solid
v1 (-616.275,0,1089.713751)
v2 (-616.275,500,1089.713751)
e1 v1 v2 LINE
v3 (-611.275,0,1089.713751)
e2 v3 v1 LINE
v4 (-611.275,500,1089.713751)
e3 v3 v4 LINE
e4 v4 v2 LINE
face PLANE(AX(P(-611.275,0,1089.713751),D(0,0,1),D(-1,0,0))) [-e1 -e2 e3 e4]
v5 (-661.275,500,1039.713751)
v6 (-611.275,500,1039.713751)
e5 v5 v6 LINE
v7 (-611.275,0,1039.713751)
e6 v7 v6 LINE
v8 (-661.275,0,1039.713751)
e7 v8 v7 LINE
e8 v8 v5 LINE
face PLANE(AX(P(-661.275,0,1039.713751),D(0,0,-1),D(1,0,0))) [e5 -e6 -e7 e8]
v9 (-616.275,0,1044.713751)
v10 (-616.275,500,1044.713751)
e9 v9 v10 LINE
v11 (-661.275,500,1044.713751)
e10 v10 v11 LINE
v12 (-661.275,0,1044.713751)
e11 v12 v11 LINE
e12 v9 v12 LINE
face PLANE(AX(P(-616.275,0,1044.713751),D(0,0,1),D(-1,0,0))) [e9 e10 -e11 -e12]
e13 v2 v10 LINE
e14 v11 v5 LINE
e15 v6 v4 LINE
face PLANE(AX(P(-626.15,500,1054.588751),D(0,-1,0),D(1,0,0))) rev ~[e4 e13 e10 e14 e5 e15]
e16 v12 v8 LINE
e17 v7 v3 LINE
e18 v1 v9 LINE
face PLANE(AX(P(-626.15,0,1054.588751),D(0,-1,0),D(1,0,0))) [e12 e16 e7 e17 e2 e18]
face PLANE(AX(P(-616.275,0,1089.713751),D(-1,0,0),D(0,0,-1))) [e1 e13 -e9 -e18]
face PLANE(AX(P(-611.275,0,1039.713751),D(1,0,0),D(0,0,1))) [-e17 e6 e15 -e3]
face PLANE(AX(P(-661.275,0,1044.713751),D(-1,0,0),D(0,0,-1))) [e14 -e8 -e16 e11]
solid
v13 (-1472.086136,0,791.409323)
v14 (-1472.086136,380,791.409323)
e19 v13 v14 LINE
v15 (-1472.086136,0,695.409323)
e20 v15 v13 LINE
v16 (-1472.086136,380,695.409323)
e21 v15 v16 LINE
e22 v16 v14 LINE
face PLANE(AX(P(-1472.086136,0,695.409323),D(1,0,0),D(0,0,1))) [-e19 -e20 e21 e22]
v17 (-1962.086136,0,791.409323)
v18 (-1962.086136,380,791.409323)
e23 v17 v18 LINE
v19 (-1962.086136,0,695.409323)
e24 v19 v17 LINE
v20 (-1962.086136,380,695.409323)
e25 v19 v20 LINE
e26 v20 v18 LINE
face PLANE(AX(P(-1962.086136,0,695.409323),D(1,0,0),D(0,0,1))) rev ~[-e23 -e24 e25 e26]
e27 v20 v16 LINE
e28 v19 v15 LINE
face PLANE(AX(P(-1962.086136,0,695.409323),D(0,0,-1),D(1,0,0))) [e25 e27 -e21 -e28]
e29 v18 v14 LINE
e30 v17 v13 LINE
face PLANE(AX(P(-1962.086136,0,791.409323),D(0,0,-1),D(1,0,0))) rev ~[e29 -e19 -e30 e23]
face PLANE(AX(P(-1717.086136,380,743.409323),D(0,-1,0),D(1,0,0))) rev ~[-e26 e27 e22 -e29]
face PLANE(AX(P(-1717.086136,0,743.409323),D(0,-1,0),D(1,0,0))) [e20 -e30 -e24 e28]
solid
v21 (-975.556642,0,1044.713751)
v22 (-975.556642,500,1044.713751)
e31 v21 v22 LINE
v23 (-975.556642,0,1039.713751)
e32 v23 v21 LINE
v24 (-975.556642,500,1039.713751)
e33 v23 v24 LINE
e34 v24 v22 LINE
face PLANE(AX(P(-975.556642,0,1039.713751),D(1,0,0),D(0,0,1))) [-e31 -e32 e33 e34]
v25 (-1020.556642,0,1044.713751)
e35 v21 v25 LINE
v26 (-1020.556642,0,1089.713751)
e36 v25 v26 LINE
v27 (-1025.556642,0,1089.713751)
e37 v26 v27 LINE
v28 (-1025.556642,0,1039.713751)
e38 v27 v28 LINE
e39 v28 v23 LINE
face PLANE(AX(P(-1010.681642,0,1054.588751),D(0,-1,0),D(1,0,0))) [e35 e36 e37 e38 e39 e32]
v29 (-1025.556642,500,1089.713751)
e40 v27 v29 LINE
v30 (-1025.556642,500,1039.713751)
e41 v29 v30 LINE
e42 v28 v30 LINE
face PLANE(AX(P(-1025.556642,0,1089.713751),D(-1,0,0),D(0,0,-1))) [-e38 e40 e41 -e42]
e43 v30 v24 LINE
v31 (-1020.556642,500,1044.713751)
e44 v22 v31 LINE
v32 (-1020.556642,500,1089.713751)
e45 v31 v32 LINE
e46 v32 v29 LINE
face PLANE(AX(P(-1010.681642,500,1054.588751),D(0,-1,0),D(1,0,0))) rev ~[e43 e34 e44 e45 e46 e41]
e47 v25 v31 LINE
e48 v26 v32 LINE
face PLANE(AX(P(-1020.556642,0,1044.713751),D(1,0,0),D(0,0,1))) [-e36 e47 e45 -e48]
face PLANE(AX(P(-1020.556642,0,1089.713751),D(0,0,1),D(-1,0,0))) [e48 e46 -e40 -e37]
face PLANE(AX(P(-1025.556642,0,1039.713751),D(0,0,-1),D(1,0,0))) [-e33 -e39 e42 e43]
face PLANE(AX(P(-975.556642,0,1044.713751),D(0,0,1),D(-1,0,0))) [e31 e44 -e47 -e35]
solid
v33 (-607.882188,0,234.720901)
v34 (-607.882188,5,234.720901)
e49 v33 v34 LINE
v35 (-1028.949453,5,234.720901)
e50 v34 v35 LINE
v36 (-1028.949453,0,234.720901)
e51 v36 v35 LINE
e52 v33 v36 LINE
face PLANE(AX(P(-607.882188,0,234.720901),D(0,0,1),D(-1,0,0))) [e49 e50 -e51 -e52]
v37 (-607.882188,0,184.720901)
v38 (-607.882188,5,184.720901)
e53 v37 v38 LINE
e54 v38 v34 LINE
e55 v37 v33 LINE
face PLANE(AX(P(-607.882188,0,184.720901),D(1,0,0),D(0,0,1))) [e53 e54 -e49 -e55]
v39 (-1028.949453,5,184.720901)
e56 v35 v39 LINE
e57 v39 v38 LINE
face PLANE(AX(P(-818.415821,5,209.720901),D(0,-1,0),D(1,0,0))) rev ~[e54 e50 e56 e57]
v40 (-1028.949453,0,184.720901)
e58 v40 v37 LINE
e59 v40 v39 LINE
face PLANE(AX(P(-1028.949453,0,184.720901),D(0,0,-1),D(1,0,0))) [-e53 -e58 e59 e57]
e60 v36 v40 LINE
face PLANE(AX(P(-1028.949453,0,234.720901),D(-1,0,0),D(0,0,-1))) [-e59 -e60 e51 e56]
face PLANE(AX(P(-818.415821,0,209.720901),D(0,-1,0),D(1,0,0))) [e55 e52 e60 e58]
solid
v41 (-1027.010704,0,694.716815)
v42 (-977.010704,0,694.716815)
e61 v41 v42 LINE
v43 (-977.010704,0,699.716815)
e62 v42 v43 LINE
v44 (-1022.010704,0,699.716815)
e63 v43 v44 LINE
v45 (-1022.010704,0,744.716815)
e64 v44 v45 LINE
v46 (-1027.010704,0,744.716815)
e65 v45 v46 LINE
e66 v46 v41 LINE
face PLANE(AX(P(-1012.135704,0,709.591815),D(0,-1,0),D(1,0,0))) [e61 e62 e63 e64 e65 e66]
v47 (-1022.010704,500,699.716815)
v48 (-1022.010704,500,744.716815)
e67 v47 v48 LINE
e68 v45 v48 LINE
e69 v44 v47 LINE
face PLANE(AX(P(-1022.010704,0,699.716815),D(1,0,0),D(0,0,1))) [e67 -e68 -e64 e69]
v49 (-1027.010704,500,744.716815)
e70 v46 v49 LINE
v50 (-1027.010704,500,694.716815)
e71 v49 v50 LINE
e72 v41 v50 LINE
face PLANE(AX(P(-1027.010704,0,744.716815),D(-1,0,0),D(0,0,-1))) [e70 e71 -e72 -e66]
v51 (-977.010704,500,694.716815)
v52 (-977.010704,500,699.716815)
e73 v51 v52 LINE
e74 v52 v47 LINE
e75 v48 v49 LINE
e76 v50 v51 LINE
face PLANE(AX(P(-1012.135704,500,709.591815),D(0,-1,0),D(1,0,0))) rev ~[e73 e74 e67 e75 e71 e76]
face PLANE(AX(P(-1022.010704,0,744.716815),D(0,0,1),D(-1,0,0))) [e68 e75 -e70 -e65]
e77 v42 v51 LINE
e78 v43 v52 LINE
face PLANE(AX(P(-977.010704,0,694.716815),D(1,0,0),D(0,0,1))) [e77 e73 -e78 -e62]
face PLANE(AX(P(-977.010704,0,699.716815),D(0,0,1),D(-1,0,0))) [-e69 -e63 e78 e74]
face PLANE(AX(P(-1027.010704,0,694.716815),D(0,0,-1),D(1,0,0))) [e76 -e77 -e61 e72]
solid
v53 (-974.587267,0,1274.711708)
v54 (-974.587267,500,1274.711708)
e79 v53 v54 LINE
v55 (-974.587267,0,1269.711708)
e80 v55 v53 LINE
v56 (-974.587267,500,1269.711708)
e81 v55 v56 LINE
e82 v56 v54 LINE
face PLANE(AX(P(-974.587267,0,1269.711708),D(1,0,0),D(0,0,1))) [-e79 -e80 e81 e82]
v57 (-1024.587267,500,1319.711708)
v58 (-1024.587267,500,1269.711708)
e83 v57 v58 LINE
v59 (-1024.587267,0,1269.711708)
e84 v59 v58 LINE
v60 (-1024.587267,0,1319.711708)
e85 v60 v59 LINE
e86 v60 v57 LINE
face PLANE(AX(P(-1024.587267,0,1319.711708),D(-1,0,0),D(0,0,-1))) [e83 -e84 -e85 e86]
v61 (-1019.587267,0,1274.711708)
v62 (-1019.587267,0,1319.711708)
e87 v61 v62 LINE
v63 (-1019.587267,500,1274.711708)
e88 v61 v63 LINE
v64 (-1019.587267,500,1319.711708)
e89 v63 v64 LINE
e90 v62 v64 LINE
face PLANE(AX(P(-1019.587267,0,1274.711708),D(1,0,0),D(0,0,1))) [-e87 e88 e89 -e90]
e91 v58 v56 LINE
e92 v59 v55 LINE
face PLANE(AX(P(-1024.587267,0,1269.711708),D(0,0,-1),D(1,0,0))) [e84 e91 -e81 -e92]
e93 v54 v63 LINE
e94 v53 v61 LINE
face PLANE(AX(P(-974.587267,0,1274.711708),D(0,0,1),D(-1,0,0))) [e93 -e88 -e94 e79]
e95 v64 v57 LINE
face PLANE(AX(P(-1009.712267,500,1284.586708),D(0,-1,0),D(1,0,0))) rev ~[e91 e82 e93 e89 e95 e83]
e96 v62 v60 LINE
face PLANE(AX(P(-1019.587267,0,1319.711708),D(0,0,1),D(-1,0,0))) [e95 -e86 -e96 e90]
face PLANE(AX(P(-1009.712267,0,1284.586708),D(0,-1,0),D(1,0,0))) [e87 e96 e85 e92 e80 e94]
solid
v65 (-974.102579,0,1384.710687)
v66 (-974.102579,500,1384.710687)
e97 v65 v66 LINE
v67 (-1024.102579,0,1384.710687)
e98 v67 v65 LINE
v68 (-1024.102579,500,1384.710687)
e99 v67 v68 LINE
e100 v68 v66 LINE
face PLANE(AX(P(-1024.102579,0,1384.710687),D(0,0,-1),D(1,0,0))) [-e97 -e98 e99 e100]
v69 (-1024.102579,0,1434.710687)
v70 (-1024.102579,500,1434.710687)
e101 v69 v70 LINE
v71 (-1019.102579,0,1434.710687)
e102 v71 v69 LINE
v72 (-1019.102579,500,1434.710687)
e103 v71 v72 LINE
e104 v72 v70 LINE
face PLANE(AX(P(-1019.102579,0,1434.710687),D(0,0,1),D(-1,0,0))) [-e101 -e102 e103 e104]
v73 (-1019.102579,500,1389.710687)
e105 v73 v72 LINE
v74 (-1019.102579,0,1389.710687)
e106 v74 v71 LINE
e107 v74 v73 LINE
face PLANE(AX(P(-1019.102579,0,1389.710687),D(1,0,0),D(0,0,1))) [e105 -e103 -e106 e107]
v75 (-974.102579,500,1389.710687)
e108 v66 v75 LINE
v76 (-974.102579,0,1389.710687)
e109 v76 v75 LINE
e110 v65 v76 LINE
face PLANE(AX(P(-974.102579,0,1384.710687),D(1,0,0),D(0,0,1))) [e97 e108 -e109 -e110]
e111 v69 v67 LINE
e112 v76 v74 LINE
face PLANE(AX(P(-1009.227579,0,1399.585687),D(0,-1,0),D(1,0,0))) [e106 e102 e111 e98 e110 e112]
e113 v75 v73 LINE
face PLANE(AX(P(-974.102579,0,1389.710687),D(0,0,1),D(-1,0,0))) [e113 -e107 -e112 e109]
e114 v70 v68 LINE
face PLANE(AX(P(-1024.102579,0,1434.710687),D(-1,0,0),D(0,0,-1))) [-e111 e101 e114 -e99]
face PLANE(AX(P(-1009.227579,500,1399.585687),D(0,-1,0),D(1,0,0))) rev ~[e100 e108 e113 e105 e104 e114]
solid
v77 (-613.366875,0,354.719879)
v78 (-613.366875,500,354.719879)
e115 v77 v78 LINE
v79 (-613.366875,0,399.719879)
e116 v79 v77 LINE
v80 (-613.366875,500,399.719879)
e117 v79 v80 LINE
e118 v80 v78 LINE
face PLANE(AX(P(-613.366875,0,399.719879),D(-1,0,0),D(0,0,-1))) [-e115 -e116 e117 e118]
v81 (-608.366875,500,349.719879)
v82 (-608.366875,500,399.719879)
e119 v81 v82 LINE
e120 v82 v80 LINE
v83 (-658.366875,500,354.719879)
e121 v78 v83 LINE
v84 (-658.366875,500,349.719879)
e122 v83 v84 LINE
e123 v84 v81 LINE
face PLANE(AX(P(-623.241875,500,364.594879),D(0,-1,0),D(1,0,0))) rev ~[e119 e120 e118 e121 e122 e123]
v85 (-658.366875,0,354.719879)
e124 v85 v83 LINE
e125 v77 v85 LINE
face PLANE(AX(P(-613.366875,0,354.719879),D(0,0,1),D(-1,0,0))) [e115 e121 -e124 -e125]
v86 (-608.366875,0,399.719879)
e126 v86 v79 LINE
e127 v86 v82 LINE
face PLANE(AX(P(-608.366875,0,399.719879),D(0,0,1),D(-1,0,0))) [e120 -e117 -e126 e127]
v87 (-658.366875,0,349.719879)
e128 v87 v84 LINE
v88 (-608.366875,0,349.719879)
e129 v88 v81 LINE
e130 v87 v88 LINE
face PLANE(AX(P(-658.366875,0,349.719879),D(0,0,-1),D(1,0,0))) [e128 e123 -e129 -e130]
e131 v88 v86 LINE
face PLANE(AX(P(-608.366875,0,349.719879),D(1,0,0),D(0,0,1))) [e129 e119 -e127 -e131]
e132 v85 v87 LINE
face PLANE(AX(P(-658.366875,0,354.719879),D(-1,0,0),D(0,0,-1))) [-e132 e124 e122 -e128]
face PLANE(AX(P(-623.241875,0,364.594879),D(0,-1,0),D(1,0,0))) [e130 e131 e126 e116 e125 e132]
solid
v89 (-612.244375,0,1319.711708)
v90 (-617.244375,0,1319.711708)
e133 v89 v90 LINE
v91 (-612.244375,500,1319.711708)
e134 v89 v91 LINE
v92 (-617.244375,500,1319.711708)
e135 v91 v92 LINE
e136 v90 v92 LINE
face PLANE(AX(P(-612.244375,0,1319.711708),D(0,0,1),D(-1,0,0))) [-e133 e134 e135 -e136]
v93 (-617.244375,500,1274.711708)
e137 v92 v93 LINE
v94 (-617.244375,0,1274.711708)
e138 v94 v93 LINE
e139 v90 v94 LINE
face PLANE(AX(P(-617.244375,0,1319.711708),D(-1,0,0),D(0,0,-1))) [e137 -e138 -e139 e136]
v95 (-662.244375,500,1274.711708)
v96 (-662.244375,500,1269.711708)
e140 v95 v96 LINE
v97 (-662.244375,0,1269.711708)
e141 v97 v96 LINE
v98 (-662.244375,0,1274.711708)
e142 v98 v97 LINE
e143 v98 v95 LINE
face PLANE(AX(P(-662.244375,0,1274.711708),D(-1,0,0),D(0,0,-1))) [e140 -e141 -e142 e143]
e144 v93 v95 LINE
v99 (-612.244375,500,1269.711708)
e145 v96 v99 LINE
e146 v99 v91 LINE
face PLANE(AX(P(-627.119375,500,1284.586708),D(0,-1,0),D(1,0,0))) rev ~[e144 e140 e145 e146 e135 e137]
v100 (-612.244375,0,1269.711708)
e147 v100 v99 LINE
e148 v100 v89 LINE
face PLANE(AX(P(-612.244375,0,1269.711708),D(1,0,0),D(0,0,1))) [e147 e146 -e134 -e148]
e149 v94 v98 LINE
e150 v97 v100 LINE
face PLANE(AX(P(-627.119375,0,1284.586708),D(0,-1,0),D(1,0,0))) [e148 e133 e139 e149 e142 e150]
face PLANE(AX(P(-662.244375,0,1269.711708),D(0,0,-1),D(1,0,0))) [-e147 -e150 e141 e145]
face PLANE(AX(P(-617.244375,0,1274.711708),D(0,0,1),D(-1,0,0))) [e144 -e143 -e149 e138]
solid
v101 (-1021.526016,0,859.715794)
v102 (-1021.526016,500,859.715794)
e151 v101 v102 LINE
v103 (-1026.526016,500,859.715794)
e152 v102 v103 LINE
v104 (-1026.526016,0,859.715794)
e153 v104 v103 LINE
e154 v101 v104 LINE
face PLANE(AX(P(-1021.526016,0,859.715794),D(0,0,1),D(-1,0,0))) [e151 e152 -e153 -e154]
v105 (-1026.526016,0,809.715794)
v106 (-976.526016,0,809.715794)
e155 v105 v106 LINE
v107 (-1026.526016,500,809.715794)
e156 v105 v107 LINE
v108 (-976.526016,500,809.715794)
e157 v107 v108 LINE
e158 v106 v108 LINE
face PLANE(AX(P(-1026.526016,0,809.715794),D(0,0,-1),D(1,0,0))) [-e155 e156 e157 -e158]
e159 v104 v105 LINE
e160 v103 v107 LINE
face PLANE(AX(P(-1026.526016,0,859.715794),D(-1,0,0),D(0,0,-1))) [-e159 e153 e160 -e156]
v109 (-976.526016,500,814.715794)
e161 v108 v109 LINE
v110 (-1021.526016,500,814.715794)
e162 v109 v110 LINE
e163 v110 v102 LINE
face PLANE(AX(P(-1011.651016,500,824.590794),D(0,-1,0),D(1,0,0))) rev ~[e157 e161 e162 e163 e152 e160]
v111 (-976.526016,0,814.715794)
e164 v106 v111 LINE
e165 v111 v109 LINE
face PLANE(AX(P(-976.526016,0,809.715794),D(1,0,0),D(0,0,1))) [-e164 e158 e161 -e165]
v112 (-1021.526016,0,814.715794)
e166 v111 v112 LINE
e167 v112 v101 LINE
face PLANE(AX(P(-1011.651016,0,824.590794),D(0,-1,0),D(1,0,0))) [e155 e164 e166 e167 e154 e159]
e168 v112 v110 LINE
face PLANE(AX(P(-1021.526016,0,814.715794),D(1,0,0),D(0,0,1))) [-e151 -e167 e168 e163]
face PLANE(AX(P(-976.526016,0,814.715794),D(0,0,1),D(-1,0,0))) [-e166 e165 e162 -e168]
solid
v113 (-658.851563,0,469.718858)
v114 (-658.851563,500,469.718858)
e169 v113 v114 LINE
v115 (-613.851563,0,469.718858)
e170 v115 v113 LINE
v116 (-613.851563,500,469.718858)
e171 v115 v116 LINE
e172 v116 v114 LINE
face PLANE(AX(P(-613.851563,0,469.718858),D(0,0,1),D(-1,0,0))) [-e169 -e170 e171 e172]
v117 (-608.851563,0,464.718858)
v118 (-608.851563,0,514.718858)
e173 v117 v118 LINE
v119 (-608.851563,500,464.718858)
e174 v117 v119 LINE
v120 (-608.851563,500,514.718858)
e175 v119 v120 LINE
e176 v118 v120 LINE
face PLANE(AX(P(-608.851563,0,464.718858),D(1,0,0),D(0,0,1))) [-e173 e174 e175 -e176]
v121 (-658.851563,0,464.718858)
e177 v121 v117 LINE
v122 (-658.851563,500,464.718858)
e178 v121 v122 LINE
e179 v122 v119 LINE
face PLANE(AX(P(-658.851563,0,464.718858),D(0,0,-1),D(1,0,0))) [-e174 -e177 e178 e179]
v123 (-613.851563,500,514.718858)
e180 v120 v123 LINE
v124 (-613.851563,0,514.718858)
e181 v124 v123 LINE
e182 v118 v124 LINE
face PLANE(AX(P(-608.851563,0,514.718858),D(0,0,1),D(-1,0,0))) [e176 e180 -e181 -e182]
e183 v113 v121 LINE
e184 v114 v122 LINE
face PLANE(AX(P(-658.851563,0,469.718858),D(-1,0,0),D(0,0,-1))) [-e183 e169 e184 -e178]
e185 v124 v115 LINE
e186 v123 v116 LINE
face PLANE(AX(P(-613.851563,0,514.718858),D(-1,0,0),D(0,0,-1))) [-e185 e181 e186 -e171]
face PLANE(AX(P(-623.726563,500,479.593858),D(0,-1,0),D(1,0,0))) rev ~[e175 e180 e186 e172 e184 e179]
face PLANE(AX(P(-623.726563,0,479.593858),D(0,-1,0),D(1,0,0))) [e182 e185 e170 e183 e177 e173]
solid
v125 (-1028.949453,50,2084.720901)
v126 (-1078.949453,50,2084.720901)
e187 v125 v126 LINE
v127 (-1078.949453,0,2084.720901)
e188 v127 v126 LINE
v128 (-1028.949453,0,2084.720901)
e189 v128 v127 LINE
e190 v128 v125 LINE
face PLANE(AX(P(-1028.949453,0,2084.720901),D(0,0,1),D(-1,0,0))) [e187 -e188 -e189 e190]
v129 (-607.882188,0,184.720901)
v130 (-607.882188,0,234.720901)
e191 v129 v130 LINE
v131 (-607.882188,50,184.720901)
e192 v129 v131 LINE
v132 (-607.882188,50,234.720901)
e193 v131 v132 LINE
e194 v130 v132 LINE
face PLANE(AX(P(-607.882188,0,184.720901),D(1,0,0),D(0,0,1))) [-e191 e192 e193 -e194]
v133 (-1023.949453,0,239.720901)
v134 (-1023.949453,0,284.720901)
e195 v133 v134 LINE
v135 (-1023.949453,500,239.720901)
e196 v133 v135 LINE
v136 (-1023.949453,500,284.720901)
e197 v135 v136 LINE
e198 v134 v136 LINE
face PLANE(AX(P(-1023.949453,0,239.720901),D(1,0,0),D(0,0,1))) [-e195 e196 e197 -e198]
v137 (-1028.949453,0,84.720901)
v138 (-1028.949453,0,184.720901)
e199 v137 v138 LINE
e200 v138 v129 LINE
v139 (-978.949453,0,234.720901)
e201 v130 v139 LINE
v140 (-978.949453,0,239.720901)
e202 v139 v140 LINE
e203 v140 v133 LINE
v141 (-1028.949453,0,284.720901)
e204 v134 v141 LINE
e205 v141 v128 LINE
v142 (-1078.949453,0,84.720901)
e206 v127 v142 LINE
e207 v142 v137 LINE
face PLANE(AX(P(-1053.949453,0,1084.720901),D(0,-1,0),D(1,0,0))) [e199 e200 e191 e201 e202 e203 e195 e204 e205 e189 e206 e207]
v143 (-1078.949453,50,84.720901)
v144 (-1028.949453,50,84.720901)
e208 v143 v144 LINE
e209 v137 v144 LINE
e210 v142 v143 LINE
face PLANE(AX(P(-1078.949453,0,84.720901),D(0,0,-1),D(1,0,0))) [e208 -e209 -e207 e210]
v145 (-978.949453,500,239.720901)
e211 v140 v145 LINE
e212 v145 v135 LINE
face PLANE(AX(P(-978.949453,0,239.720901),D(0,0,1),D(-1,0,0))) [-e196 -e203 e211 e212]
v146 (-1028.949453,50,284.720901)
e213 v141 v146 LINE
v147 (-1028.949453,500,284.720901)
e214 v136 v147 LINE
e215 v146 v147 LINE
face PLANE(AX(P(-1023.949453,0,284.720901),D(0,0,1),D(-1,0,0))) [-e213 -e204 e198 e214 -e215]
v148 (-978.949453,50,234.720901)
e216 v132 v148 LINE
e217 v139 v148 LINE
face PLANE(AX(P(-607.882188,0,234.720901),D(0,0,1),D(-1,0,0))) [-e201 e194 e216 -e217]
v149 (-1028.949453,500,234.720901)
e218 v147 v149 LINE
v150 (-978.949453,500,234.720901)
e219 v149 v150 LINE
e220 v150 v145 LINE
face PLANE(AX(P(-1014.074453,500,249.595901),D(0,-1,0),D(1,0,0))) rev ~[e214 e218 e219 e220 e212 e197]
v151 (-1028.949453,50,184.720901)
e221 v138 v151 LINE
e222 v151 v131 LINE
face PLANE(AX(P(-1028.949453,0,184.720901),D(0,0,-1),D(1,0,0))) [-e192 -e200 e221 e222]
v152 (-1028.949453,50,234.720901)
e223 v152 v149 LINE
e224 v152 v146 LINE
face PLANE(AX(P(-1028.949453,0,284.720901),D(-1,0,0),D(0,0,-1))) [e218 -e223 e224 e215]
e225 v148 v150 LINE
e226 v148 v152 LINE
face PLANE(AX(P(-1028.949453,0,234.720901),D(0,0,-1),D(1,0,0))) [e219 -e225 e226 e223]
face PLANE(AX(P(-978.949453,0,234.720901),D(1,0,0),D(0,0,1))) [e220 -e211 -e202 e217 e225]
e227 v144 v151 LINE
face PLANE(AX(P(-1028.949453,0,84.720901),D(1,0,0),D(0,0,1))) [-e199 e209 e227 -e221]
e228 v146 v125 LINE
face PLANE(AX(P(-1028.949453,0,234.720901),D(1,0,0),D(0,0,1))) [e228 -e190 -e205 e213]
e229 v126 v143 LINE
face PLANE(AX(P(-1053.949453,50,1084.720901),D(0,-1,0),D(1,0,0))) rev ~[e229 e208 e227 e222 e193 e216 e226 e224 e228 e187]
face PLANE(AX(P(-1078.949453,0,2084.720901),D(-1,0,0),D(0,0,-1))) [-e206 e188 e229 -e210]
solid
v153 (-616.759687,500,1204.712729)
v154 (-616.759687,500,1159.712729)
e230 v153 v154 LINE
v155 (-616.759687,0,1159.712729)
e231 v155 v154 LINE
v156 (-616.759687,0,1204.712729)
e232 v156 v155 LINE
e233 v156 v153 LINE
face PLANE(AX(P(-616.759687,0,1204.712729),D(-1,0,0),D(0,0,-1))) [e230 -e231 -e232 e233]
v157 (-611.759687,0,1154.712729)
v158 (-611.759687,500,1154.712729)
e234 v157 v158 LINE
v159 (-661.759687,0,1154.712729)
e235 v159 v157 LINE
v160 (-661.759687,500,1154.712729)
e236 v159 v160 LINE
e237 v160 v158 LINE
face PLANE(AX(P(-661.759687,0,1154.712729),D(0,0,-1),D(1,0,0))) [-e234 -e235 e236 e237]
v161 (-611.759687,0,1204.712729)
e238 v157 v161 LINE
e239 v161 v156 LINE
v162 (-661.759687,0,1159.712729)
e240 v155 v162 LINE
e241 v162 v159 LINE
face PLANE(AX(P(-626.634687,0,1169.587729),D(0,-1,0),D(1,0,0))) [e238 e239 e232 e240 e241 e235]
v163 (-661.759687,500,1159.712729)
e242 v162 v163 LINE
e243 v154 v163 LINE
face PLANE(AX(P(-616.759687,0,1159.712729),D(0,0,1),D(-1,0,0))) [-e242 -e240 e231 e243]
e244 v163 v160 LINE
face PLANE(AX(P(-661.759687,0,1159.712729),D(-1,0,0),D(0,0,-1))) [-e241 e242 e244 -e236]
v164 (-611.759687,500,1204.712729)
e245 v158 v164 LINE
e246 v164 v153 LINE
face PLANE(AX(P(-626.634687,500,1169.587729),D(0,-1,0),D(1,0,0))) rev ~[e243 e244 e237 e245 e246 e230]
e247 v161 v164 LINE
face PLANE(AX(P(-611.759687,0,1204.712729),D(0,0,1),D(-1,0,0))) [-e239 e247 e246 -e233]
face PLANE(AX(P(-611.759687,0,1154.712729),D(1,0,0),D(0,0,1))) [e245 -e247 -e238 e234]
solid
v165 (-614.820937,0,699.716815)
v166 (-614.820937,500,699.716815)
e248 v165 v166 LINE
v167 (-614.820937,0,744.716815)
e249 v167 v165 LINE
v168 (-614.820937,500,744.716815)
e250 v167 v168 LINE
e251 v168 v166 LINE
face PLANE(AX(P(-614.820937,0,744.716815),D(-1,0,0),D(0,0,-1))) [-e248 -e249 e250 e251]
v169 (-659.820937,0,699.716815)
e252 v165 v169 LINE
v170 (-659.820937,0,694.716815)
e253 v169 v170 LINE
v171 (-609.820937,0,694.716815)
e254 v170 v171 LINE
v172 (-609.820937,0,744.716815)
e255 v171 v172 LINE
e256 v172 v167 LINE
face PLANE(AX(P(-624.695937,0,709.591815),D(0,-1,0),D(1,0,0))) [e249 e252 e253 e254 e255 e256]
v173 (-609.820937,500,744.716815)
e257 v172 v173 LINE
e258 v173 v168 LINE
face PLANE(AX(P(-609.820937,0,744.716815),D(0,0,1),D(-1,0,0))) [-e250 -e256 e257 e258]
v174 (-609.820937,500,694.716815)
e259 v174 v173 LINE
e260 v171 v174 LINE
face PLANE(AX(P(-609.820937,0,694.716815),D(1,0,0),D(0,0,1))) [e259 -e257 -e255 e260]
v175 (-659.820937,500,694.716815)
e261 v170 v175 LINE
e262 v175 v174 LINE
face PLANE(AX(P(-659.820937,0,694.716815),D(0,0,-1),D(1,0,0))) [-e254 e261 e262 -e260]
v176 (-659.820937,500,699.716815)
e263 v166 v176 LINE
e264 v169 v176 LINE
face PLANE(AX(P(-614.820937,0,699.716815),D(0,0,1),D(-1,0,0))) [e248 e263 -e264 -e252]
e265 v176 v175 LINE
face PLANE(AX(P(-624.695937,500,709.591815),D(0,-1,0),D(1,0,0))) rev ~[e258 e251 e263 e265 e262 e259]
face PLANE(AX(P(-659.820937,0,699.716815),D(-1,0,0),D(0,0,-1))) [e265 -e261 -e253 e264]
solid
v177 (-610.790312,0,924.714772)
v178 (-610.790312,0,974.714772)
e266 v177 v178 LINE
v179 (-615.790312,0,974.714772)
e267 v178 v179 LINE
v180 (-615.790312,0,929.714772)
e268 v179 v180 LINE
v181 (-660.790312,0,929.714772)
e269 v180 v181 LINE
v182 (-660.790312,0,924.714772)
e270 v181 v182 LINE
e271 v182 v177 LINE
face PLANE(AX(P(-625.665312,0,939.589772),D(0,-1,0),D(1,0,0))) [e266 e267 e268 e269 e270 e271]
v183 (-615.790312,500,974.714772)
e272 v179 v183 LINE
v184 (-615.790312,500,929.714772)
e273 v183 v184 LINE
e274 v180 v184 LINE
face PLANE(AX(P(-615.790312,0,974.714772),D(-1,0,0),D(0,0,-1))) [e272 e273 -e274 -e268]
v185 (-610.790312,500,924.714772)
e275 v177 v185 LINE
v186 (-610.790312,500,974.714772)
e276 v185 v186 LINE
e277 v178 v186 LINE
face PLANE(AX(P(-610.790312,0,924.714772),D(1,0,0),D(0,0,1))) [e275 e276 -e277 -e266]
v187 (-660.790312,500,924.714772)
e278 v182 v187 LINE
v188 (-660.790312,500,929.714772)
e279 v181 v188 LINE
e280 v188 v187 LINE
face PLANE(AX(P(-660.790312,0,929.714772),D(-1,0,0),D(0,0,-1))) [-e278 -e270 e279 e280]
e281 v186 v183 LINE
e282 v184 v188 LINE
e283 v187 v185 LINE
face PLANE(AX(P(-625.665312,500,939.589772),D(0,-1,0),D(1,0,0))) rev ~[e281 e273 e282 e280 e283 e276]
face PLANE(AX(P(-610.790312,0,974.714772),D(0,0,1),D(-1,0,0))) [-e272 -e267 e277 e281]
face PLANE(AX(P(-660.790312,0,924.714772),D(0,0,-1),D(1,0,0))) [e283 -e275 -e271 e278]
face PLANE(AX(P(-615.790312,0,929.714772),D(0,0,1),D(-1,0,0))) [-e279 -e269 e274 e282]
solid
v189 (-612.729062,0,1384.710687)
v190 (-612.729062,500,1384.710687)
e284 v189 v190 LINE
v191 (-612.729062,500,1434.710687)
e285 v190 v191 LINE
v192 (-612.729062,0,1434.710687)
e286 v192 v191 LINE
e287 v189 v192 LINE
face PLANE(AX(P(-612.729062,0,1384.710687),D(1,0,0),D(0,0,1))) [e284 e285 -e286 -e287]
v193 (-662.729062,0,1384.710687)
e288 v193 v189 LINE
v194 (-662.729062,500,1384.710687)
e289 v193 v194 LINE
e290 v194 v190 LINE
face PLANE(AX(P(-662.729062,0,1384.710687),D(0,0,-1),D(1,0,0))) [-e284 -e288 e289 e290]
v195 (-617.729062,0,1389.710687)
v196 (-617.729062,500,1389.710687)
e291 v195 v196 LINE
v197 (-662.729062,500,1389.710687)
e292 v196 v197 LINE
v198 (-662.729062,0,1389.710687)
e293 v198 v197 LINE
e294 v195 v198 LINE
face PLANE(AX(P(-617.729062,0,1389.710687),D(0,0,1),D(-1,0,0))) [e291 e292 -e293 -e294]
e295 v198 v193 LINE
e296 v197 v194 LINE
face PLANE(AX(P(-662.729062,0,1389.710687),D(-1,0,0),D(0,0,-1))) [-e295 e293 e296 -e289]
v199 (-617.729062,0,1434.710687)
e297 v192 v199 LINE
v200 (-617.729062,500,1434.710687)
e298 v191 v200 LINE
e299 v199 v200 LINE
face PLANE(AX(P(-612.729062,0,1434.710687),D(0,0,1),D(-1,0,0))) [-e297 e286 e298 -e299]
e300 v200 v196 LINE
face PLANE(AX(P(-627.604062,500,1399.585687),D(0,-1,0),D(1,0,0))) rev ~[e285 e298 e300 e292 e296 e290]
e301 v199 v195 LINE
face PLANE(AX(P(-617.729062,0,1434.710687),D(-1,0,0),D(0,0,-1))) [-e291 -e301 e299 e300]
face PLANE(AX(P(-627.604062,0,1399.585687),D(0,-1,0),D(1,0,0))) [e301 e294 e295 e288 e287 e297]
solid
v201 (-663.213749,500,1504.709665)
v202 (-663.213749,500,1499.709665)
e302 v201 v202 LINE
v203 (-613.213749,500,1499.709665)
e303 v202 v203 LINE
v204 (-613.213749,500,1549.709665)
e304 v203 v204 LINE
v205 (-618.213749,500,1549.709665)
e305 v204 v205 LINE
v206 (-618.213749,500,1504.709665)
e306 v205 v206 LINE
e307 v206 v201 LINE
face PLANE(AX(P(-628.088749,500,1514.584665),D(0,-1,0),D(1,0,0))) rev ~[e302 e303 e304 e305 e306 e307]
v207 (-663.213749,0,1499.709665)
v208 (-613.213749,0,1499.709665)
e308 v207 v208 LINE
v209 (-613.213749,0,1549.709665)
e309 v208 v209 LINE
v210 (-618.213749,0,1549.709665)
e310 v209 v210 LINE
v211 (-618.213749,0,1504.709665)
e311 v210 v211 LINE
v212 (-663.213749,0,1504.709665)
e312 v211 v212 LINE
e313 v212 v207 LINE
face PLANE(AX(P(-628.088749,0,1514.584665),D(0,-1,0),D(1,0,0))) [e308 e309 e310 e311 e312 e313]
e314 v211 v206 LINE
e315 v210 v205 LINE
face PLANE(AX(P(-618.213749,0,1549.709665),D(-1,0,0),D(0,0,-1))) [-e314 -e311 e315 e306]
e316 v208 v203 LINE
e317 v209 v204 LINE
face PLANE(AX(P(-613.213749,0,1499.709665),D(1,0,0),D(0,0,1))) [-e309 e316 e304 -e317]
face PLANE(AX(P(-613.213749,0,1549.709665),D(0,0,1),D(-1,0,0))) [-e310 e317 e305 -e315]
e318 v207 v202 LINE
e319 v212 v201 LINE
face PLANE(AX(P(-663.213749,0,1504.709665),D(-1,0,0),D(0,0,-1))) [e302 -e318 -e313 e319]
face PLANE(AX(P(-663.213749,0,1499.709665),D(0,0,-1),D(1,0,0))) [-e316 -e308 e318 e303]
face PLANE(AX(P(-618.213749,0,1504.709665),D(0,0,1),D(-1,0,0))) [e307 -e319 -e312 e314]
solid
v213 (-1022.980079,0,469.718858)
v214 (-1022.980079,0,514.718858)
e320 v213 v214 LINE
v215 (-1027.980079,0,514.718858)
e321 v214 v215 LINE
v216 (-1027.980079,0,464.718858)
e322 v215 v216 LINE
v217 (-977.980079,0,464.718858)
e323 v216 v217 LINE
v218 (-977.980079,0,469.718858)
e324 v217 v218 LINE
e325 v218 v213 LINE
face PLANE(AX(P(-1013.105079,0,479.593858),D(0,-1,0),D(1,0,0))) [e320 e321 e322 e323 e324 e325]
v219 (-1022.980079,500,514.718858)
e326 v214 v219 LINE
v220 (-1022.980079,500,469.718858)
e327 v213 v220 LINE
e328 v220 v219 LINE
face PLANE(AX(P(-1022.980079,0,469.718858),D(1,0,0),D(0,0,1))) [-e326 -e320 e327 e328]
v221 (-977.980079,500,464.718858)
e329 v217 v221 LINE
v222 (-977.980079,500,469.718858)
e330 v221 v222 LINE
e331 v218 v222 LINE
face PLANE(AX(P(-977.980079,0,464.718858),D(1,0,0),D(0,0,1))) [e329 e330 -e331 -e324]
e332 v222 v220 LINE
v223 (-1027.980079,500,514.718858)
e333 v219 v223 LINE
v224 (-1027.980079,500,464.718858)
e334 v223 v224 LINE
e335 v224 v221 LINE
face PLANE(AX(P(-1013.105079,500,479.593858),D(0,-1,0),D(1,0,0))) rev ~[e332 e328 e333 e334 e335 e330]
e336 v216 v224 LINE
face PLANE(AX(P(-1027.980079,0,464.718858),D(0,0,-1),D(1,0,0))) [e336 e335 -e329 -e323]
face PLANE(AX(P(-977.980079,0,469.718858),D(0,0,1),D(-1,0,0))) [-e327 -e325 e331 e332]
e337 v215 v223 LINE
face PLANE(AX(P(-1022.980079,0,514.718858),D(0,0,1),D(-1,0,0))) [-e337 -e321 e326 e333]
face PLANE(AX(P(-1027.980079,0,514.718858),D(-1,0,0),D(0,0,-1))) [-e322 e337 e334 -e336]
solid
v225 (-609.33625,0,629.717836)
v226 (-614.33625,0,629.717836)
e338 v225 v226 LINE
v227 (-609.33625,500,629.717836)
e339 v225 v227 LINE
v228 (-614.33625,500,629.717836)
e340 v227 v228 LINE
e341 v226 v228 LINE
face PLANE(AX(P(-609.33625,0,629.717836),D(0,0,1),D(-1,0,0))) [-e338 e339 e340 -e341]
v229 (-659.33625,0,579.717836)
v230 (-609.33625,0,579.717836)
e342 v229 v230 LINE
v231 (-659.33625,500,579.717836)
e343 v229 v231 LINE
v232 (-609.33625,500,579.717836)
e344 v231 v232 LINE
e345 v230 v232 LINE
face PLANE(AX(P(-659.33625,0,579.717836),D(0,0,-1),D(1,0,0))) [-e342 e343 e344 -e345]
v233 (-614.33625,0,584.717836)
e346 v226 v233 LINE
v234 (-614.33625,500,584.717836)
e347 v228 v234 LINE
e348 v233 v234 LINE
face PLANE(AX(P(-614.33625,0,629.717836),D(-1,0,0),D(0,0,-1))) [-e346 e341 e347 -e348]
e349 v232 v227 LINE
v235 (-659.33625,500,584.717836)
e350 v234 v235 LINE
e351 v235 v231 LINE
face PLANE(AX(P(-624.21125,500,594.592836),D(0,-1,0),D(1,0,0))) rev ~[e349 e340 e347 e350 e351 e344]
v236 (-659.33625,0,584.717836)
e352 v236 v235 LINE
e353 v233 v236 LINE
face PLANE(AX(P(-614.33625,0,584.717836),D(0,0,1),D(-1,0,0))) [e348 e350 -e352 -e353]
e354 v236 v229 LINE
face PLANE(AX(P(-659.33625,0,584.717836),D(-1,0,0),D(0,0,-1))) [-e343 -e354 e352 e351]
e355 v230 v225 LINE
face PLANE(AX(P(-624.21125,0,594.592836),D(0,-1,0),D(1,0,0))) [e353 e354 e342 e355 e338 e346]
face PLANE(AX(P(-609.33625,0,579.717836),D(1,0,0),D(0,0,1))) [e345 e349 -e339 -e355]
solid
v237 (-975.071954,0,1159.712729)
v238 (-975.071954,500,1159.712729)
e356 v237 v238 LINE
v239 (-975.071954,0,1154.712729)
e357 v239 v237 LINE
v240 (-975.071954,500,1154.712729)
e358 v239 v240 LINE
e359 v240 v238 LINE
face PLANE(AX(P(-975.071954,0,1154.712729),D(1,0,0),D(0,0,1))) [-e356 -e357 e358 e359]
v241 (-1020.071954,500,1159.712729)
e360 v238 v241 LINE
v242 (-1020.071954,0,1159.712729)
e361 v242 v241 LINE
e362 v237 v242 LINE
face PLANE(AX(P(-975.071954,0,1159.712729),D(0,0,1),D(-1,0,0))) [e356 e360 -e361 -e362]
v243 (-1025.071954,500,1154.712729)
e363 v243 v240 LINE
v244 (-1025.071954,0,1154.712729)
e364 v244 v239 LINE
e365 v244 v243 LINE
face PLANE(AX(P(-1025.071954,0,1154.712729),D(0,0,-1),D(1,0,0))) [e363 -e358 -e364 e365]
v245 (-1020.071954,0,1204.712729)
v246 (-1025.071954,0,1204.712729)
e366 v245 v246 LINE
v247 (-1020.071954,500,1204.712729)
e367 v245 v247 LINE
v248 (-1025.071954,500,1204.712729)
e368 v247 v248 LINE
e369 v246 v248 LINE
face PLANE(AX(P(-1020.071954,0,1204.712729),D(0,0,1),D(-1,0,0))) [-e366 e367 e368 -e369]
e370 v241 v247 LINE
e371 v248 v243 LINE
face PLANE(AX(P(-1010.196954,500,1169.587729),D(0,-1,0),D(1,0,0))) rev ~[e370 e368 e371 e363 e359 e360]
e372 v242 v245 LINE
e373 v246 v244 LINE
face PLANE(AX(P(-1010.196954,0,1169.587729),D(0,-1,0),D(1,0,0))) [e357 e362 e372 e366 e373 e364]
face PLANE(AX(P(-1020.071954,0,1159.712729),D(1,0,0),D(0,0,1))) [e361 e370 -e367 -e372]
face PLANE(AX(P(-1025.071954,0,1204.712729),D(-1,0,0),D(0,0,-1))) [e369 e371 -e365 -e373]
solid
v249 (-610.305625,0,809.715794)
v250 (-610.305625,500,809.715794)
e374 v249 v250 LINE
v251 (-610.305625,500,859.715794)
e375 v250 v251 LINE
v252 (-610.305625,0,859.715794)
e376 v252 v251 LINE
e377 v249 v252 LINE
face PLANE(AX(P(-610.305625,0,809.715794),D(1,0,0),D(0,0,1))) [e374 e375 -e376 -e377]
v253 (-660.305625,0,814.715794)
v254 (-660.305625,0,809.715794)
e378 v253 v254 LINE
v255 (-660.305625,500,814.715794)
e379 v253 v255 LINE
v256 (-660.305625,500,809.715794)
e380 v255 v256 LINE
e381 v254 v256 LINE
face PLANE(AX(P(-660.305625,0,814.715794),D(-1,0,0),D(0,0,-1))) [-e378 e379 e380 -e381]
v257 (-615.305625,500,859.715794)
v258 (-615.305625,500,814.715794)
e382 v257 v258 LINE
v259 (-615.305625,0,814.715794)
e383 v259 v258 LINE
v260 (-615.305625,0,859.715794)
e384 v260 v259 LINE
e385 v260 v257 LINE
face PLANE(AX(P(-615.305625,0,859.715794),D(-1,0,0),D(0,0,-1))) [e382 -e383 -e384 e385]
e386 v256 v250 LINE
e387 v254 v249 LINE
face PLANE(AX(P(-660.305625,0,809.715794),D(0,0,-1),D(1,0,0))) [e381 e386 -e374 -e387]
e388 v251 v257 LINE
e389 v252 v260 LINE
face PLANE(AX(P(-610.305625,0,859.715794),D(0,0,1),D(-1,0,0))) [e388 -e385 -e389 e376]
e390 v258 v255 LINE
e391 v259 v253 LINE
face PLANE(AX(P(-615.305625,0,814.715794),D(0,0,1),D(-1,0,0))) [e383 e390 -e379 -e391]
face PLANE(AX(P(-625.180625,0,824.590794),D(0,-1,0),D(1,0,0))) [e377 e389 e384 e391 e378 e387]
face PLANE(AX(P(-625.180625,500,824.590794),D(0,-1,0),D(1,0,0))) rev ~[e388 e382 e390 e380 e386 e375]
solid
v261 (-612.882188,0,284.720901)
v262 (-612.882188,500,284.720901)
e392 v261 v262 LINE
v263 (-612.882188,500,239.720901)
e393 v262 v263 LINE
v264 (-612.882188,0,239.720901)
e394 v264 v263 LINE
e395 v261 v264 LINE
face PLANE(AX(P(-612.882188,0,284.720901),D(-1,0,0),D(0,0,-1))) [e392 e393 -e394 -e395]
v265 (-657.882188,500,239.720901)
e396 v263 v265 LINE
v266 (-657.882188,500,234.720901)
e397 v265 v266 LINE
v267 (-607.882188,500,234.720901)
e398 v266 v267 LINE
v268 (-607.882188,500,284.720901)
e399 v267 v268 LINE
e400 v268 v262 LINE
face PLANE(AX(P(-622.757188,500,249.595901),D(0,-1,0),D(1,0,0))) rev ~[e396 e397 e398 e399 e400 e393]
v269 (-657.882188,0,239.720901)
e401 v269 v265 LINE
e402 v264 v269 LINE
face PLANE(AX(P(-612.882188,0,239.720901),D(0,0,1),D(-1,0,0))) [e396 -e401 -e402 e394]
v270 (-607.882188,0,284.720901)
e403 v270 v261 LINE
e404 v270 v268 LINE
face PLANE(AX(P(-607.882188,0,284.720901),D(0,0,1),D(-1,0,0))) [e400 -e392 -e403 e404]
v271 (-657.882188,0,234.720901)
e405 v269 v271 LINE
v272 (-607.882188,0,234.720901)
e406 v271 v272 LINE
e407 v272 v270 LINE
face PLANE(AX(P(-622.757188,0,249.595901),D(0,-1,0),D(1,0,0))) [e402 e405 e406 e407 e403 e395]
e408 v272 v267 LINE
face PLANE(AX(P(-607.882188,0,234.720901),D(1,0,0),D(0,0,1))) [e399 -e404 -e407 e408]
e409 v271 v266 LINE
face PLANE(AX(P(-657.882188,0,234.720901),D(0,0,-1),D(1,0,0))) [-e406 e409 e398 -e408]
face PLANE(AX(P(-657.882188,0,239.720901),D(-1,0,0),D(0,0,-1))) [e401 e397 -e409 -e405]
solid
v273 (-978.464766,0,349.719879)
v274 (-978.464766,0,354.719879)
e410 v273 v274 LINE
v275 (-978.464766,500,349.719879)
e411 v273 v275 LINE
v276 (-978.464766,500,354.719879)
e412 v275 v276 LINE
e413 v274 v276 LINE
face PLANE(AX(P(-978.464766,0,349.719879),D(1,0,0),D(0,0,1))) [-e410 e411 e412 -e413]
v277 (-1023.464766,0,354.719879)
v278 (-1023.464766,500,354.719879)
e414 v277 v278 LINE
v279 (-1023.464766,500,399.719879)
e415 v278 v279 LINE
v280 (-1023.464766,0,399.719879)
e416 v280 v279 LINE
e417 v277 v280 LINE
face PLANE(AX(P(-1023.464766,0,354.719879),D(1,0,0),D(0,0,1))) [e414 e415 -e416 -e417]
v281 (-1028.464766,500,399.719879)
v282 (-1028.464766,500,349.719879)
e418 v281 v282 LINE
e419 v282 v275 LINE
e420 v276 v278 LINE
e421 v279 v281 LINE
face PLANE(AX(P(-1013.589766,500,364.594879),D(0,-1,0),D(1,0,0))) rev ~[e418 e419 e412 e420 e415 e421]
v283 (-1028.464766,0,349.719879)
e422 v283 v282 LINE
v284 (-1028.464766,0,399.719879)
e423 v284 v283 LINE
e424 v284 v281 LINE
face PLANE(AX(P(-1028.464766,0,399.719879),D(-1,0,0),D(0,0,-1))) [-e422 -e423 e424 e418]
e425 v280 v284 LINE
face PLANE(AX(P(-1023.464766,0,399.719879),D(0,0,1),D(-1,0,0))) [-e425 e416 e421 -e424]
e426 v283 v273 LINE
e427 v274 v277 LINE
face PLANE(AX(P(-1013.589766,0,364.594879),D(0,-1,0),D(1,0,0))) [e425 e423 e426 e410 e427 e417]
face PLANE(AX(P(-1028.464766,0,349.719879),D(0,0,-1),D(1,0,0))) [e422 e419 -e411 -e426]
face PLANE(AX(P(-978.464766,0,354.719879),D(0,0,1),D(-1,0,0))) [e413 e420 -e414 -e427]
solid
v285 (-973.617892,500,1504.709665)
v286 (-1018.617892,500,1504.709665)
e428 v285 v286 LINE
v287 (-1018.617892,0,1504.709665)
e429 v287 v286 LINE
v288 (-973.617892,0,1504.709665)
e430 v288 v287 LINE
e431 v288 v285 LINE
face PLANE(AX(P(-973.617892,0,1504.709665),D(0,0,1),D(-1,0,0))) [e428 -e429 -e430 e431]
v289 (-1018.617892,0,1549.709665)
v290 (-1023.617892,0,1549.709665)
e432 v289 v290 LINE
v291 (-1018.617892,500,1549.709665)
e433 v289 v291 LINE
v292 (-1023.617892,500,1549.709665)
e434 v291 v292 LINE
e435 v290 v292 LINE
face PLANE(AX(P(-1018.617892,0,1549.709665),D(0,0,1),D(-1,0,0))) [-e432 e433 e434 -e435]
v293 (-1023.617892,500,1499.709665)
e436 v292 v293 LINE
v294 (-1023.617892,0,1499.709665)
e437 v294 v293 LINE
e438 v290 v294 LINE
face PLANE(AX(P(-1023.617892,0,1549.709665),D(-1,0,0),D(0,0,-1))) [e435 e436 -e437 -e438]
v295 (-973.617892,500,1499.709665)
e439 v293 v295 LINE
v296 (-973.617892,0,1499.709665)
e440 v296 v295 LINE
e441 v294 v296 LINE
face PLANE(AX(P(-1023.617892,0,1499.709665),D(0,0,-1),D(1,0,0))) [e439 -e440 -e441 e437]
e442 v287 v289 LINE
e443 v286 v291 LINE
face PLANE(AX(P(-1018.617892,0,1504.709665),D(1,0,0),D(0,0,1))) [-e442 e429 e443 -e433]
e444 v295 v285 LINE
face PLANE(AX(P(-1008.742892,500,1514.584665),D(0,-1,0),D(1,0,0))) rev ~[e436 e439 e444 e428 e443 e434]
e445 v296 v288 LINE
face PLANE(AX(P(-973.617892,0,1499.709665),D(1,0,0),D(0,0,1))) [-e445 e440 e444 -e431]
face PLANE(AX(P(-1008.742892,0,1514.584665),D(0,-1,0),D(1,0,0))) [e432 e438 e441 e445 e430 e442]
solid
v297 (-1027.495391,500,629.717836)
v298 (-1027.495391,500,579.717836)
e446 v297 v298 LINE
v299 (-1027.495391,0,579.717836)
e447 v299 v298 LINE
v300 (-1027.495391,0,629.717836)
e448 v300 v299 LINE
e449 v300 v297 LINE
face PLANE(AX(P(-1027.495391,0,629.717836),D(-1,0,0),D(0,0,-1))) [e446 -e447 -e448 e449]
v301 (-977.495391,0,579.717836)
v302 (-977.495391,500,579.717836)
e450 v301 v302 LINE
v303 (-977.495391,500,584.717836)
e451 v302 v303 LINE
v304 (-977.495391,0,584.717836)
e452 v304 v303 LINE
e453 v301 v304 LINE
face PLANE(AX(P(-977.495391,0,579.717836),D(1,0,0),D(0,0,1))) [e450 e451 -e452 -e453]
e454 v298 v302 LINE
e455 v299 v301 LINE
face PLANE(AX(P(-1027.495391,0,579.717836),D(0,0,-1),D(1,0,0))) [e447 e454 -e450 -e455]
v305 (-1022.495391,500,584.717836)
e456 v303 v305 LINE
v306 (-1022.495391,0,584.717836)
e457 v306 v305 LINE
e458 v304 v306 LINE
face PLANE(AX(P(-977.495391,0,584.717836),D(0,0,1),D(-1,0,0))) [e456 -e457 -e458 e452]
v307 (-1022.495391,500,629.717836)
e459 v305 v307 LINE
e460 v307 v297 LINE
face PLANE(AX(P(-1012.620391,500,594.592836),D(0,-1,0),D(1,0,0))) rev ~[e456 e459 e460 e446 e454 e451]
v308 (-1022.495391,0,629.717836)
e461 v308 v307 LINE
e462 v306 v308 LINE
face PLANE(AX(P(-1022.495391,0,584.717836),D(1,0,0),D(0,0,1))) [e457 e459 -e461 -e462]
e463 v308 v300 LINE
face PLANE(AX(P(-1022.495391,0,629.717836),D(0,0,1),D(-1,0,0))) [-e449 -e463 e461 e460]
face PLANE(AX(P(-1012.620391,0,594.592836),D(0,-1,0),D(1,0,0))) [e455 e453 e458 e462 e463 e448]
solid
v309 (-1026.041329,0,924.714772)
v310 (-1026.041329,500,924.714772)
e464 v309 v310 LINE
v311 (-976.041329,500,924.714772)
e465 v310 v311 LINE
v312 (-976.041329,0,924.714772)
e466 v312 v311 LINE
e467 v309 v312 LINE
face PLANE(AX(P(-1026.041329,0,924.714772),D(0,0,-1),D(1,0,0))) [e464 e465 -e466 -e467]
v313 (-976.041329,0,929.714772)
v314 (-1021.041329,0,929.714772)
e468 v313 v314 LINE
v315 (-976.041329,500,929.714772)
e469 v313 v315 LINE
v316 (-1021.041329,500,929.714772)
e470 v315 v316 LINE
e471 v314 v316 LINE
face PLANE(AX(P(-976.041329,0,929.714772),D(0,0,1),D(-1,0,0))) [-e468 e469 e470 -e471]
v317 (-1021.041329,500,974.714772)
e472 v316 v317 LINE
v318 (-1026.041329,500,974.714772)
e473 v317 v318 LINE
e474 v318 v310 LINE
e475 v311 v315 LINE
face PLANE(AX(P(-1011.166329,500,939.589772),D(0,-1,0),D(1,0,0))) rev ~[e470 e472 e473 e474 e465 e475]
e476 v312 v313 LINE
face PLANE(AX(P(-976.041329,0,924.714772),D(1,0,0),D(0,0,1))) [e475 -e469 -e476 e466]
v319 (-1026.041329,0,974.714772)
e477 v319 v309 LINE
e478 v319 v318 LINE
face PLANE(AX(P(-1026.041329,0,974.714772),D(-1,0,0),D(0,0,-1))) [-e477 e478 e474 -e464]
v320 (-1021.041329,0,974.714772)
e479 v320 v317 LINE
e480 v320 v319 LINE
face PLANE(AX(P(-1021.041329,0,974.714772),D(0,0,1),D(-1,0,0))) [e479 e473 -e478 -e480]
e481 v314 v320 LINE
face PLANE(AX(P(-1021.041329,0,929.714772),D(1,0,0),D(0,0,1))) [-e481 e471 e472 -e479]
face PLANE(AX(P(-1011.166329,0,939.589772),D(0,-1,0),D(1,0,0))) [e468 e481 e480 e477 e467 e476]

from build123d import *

# Parameters (mm, degrees)
F1_DEPTH = 500
F2_DEPTH = 50
F3_DEPTH = 5
F4_W     = 490
F4_H     = 96
F5_DEPTH = 380


with BuildPart() as f1:
    # F0 (on Front) → F1 (new body)
    with BuildSketch(Plane.XZ):
        Polygon((-618.2137493553, 1549.7096652101), (-618.2137493553, 1504.7096652101), (-663.2137493553, 1504.7096652101), (-663.2137493553, 1499.7096652101), (-613.2137493553, 1499.7096652101), (-613.2137493553, 1549.7096652101), align=None)
    extrude(amount=-F1_DEPTH)


with BuildPart() as f1b:
    # F0 (on Front) → F1, piece 2 (new body)
    with BuildSketch(Plane.XZ):
        Polygon((-611.2749996911, 1089.7137508263), (-616.2749996911, 1089.7137508263), (-616.2749996911, 1044.7137508263), (-661.2749996911, 1044.7137508263), (-661.2749996911, 1039.7137508263), (-611.2749996911, 1039.7137508263), align=None)
    extrude(amount=-F1_DEPTH)


with BuildPart() as f1c:
    # F0 (on Front) → F1, piece 3 (new body)
    with BuildSketch(Plane.XZ):
        Polygon((-662.7290619393, 1389.7106866141), (-662.7290619393, 1384.7106866142), (-612.7290619393, 1384.7106866142), (-612.7290619393, 1434.7106866142), (-617.7290619393, 1434.7106866142), (-617.7290619393, 1389.7106866142), align=None)
    extrude(amount=-F1_DEPTH)


with BuildPart() as f1d:
    # F0 (on Front) → F1, piece 4 (new body)
    with BuildSketch(Plane.XZ):
        Polygon((-612.2443745232, 1319.7117080182), (-617.2443745232, 1319.7117080182), (-617.2443745232, 1274.7117080182), (-662.2443745232, 1274.7117080182), (-662.2443745232, 1269.7117080182), (-612.2443745232, 1269.7117080182), align=None)
    extrude(amount=-F1_DEPTH)


with BuildPart() as f1e:
    # F0 (on Front) → F1, piece 5 (new body)
    with BuildSketch(Plane.XZ):
        Polygon((-611.7596871071, 1154.7127294223), (-611.7596871071, 1204.7127294223), (-616.7596871071, 1204.7127294223), (-616.7596871071, 1159.7127294223), (-661.7596871071, 1159.7127294223), (-661.7596871071, 1154.7127294223), align=None)
    extrude(amount=-F1_DEPTH)


with BuildPart() as f1f:
    # F0 (on Front) → F1, piece 6 (new body)
    with BuildSketch(Plane.XZ):
        Polygon((-659.3362500268, 584.7178364426), (-659.3362500268, 579.7178364426), (-609.3362500268, 579.7178364426), (-609.3362500268, 629.7178364426), (-614.3362500268, 629.7178364426), (-614.3362500268, 584.7178364426), align=None)
    extrude(amount=-F1_DEPTH)


with BuildPart() as f1g:
    # F0 (on Front) → F1, piece 7 (new body)
    with BuildSketch(Plane.XZ):
        Polygon((-660.305624859, 814.7157936345), (-660.305624859, 809.7157936345), (-610.305624859, 809.7157936345), (-610.305624859, 859.7157936345), (-615.305624859, 859.7157936345), (-615.305624859, 814.7157936345), align=None)
    extrude(amount=-F1_DEPTH)


with BuildPart() as f1h:
    # F0 (on Front) → F1, piece 8 (new body)
    with BuildSketch(Plane.XZ):
        Polygon((-609.8209374429, 744.7168150385), (-614.8209374429, 744.7168150385), (-614.8209374429, 699.7168150385), (-659.8209374429, 699.7168150385), (-659.8209374429, 694.7168150385), (-609.8209374429, 694.7168150385), align=None)
    extrude(amount=-F1_DEPTH)


with BuildPart() as f1i:
    # F0 (on Front) → F1, piece 9 (new body)
    with BuildSketch(Plane.XZ):
        Polygon((-658.8515626108, 469.7188578467), (-658.8515626108, 464.7188578467), (-608.8515626108, 464.7188578467), (-608.8515626108, 514.7188578467), (-613.8515626108, 514.7188578467), (-613.8515626108, 469.7188578467), align=None)
    extrude(amount=-F1_DEPTH)


with BuildPart() as f1j:
    # F0 (on Front) → F1, piece 10 (new body)
    with BuildSketch(Plane.XZ):
        Polygon((-660.790312275, 929.7147722304), (-660.790312275, 924.7147722304), (-610.790312275, 924.7147722304), (-610.790312275, 974.7147722304), (-615.790312275, 974.7147722304), (-615.790312275, 929.7147722304), align=None)
    extrude(amount=-F1_DEPTH)


with BuildPart() as f1k:
    # F0 (on Front) → F1, piece 11 (new body)
    with BuildSketch(Plane.XZ):
        Polygon((-658.3668751947, 354.7198792507), (-658.3668751947, 349.7198792507), (-608.3668751947, 349.7198792507), (-608.3668751947, 399.7198792507), (-613.3668751947, 399.7198792507), (-613.3668751947, 354.7198792507), align=None)
    extrude(amount=-F1_DEPTH)


with BuildPart() as f1l:
    # F0 (on Front) → F1, piece 12 (new body)
    with BuildSketch(Plane.XZ):
        Polygon((-1018.6178918419, 1549.7096652101), (-1023.6178918419, 1549.7096652101), (-1023.6178918419, 1499.7096652101), (-973.6178918419, 1499.7096652101), (-973.6178918419, 1504.7096652101), (-1018.6178918419, 1504.7096652101), align=None)
    extrude(amount=-F1_DEPTH)


with BuildPart() as f1m:
    # F0 (on Front) → F1, piece 13 (new body)
    with BuildSketch(Plane.XZ):
        Polygon((-1019.1025792579, 1434.7106866142), (-1024.1025792579, 1434.7106866142), (-1024.1025792579, 1384.7106866142), (-974.1025792579, 1384.7106866142), (-974.1025792579, 1389.7106866141), (-1019.1025792579, 1389.7106866142), align=None)
    extrude(amount=-F1_DEPTH)


with BuildPart() as f1n:
    # F0 (on Front) → F1, piece 14 (new body)
    with BuildSketch(Plane.XZ):
        Polygon((-1028.9494534186, 284.7209006548), (-1028.9494534186, 234.7209006548), (-978.9494534186, 234.7209006548), (-978.9494534186, 239.7209006548), (-1023.9494534186, 239.7209006548), (-1023.9494534186, 284.7209006548), align=None)
    extrude(amount=-F1_DEPTH)

    # F0 (on Front) → F2 (join)
    with BuildSketch(Plane.XZ):
        Polygon((-1078.9494534186, 2084.7209006548), (-1078.9494534186, 84.7209006548), (-1028.9494534186, 84.7209006548), (-1028.9494534186, 184.7209006548), (-1028.9494534186, 234.7209006548), (-1028.9494534186, 284.7209006548), (-1028.9494534186, 2034.7209006548), (-1028.9494534186, 2084.7209006548), align=None)
        Polygon((-1028.9494534186, 234.7209006548), (-1028.9494534186, 184.7209006548), (-607.8821877786, 184.7209006548), (-607.8821877786, 234.7209006548), (-657.8821877786, 234.7209006548), (-978.9494534186, 234.7209006548), align=None)
    extrude(amount=-F2_DEPTH)


with BuildPart() as f1o:
    # F0 (on Front) → F1, piece 15 (new body)
    with BuildSketch(Plane.XZ):
        Polygon((-1023.4647660025, 399.7198792507), (-1028.4647660025, 399.7198792507), (-1028.4647660025, 349.7198792507), (-978.4647660025, 349.7198792507), (-978.4647660025, 354.7198792507), (-1023.4647660025, 354.7198792507), align=None)
    extrude(amount=-F1_DEPTH)


with BuildPart() as f1p:
    # F0 (on Front) → F1, piece 16 (new body)
    with BuildSketch(Plane.XZ):
        Polygon((-657.8821877786, 234.7209006548), (-607.8821877786, 234.7209006548), (-607.8821877786, 284.7209006548), (-612.8821877786, 284.7209006548), (-612.8821877786, 239.7209006548), (-657.8821877786, 239.7209006548), align=None)
    extrude(amount=-F1_DEPTH)


with BuildPart() as f1q:
    # F0 (on Front) → F1, piece 17 (new body)
    with BuildSketch(Plane.XZ):
        Polygon((-1022.9800785864, 514.7188578467), (-1027.9800785864, 514.7188578467), (-1027.9800785864, 464.7188578467), (-977.9800785864, 464.7188578467), (-977.9800785864, 469.7188578467), (-1022.9800785864, 469.7188578467), align=None)
    extrude(amount=-F1_DEPTH)


with BuildPart() as f1r:
    # F0 (on Front) → F1, piece 18 (new body)
    with BuildSketch(Plane.XZ):
        Polygon((-1022.4953911704, 629.7178364426), (-1027.4953911704, 629.7178364426), (-1027.4953911704, 579.7178364426), (-977.4953911704, 579.7178364426), (-977.4953911704, 584.7178364426), (-1022.4953911704, 584.7178364426), align=None)
    extrude(amount=-F1_DEPTH)


with BuildPart() as f1s:
    # F0 (on Front) → F1, piece 19 (new body)
    with BuildSketch(Plane.XZ):
        Polygon((-1022.0107037543, 744.7168150385), (-1027.0107037543, 744.7168150385), (-1027.0107037543, 694.7168150385), (-977.0107037543, 694.7168150385), (-977.0107037543, 699.7168150385), (-1022.0107037543, 699.7168150385), align=None)
    extrude(amount=-F1_DEPTH)


with BuildPart() as f1t:
    # F0 (on Front) → F1, piece 20 (new body)
    with BuildSketch(Plane.XZ):
        Polygon((-1021.5260163382, 859.7157936345), (-1026.5260163382, 859.7157936345), (-1026.5260163382, 809.7157936345), (-976.5260163382, 809.7157936345), (-976.5260163382, 814.7157936345), (-1021.5260163382, 814.7157936345), align=None)
    extrude(amount=-F1_DEPTH)


with BuildPart() as f1u:
    # F0 (on Front) → F1, piece 21 (new body)
    with BuildSketch(Plane.XZ):
        Polygon((-1019.587266674, 1319.7117080182), (-1024.587266674, 1319.7117080182), (-1024.587266674, 1269.7117080182), (-974.587266674, 1269.7117080182), (-974.587266674, 1274.7117080182), (-1019.587266674, 1274.7117080182), align=None)
    extrude(amount=-F1_DEPTH)


with BuildPart() as f1v:
    # F0 (on Front) → F1, piece 22 (new body)
    with BuildSketch(Plane.XZ):
        Polygon((-1020.0719540901, 1204.7127294223), (-1025.0719540901, 1204.7127294223), (-1025.0719540901, 1154.7127294223), (-975.0719540901, 1154.7127294223), (-975.0719540901, 1159.7127294223), (-1020.0719540901, 1159.7127294223), align=None)
    extrude(amount=-F1_DEPTH)


with BuildPart() as f1w:
    # F0 (on Front) → F1, piece 23 (new body)
    with BuildSketch(Plane.XZ):
        Polygon((-1020.5566415061, 1089.7137508263), (-1025.5566415061, 1089.7137508263), (-1025.5566415061, 1039.7137508263), (-975.5566415061, 1039.7137508263), (-975.5566415061, 1044.7137508263), (-1020.5566415061, 1044.7137508263), align=None)
    extrude(amount=-F1_DEPTH)


with BuildPart() as f1x:
    # F0 (on Front) → F1, piece 24 (new body)
    with BuildSketch(Plane.XZ):
        Polygon((-1021.0413289222, 974.7147722304), (-1026.0413289222, 974.7147722304), (-1026.0413289222, 924.7147722304), (-976.0413289222, 924.7147722304), (-976.0413289222, 929.7147722304), (-1021.0413289222, 929.7147722304), align=None)
    extrude(amount=-F1_DEPTH)


with BuildPart() as f3:
    # F0 (on Front) → F3 (new body)
    with BuildSketch(Plane.XZ):
        Polygon((-1028.9494534186, 234.7209006548), (-1028.9494534186, 184.7209006548), (-607.8821877786, 184.7209006548), (-607.8821877786, 234.7209006548), (-657.8821877786, 234.7209006548), (-978.9494534186, 234.7209006548), align=None)
    extrude(amount=-F3_DEPTH)


with BuildPart() as f5:
    # F4 (on Front) → F5 (new body)
    with BuildSketch(Plane.XZ):
        with Locations((-1717.0861363411, 743.4093228319)):
            Rectangle(F4_W, F4_H)
    extrude(amount=-F5_DEPTH)


solid = Compound([f1.part, f1b.part, f1c.part, f1d.part, f1e.part, f1f.part, f1g.part, f1h.part, f1i.part, f1j.part, f1k.part, f1l.part, f1m.part, f1n.part, f1o.part, f1p.part, f1q.part, f1r.part, f1s.part, f1t.part, f1u.part, f1v.part, f1w.part, f1x.part, f3.part, f5.part])
